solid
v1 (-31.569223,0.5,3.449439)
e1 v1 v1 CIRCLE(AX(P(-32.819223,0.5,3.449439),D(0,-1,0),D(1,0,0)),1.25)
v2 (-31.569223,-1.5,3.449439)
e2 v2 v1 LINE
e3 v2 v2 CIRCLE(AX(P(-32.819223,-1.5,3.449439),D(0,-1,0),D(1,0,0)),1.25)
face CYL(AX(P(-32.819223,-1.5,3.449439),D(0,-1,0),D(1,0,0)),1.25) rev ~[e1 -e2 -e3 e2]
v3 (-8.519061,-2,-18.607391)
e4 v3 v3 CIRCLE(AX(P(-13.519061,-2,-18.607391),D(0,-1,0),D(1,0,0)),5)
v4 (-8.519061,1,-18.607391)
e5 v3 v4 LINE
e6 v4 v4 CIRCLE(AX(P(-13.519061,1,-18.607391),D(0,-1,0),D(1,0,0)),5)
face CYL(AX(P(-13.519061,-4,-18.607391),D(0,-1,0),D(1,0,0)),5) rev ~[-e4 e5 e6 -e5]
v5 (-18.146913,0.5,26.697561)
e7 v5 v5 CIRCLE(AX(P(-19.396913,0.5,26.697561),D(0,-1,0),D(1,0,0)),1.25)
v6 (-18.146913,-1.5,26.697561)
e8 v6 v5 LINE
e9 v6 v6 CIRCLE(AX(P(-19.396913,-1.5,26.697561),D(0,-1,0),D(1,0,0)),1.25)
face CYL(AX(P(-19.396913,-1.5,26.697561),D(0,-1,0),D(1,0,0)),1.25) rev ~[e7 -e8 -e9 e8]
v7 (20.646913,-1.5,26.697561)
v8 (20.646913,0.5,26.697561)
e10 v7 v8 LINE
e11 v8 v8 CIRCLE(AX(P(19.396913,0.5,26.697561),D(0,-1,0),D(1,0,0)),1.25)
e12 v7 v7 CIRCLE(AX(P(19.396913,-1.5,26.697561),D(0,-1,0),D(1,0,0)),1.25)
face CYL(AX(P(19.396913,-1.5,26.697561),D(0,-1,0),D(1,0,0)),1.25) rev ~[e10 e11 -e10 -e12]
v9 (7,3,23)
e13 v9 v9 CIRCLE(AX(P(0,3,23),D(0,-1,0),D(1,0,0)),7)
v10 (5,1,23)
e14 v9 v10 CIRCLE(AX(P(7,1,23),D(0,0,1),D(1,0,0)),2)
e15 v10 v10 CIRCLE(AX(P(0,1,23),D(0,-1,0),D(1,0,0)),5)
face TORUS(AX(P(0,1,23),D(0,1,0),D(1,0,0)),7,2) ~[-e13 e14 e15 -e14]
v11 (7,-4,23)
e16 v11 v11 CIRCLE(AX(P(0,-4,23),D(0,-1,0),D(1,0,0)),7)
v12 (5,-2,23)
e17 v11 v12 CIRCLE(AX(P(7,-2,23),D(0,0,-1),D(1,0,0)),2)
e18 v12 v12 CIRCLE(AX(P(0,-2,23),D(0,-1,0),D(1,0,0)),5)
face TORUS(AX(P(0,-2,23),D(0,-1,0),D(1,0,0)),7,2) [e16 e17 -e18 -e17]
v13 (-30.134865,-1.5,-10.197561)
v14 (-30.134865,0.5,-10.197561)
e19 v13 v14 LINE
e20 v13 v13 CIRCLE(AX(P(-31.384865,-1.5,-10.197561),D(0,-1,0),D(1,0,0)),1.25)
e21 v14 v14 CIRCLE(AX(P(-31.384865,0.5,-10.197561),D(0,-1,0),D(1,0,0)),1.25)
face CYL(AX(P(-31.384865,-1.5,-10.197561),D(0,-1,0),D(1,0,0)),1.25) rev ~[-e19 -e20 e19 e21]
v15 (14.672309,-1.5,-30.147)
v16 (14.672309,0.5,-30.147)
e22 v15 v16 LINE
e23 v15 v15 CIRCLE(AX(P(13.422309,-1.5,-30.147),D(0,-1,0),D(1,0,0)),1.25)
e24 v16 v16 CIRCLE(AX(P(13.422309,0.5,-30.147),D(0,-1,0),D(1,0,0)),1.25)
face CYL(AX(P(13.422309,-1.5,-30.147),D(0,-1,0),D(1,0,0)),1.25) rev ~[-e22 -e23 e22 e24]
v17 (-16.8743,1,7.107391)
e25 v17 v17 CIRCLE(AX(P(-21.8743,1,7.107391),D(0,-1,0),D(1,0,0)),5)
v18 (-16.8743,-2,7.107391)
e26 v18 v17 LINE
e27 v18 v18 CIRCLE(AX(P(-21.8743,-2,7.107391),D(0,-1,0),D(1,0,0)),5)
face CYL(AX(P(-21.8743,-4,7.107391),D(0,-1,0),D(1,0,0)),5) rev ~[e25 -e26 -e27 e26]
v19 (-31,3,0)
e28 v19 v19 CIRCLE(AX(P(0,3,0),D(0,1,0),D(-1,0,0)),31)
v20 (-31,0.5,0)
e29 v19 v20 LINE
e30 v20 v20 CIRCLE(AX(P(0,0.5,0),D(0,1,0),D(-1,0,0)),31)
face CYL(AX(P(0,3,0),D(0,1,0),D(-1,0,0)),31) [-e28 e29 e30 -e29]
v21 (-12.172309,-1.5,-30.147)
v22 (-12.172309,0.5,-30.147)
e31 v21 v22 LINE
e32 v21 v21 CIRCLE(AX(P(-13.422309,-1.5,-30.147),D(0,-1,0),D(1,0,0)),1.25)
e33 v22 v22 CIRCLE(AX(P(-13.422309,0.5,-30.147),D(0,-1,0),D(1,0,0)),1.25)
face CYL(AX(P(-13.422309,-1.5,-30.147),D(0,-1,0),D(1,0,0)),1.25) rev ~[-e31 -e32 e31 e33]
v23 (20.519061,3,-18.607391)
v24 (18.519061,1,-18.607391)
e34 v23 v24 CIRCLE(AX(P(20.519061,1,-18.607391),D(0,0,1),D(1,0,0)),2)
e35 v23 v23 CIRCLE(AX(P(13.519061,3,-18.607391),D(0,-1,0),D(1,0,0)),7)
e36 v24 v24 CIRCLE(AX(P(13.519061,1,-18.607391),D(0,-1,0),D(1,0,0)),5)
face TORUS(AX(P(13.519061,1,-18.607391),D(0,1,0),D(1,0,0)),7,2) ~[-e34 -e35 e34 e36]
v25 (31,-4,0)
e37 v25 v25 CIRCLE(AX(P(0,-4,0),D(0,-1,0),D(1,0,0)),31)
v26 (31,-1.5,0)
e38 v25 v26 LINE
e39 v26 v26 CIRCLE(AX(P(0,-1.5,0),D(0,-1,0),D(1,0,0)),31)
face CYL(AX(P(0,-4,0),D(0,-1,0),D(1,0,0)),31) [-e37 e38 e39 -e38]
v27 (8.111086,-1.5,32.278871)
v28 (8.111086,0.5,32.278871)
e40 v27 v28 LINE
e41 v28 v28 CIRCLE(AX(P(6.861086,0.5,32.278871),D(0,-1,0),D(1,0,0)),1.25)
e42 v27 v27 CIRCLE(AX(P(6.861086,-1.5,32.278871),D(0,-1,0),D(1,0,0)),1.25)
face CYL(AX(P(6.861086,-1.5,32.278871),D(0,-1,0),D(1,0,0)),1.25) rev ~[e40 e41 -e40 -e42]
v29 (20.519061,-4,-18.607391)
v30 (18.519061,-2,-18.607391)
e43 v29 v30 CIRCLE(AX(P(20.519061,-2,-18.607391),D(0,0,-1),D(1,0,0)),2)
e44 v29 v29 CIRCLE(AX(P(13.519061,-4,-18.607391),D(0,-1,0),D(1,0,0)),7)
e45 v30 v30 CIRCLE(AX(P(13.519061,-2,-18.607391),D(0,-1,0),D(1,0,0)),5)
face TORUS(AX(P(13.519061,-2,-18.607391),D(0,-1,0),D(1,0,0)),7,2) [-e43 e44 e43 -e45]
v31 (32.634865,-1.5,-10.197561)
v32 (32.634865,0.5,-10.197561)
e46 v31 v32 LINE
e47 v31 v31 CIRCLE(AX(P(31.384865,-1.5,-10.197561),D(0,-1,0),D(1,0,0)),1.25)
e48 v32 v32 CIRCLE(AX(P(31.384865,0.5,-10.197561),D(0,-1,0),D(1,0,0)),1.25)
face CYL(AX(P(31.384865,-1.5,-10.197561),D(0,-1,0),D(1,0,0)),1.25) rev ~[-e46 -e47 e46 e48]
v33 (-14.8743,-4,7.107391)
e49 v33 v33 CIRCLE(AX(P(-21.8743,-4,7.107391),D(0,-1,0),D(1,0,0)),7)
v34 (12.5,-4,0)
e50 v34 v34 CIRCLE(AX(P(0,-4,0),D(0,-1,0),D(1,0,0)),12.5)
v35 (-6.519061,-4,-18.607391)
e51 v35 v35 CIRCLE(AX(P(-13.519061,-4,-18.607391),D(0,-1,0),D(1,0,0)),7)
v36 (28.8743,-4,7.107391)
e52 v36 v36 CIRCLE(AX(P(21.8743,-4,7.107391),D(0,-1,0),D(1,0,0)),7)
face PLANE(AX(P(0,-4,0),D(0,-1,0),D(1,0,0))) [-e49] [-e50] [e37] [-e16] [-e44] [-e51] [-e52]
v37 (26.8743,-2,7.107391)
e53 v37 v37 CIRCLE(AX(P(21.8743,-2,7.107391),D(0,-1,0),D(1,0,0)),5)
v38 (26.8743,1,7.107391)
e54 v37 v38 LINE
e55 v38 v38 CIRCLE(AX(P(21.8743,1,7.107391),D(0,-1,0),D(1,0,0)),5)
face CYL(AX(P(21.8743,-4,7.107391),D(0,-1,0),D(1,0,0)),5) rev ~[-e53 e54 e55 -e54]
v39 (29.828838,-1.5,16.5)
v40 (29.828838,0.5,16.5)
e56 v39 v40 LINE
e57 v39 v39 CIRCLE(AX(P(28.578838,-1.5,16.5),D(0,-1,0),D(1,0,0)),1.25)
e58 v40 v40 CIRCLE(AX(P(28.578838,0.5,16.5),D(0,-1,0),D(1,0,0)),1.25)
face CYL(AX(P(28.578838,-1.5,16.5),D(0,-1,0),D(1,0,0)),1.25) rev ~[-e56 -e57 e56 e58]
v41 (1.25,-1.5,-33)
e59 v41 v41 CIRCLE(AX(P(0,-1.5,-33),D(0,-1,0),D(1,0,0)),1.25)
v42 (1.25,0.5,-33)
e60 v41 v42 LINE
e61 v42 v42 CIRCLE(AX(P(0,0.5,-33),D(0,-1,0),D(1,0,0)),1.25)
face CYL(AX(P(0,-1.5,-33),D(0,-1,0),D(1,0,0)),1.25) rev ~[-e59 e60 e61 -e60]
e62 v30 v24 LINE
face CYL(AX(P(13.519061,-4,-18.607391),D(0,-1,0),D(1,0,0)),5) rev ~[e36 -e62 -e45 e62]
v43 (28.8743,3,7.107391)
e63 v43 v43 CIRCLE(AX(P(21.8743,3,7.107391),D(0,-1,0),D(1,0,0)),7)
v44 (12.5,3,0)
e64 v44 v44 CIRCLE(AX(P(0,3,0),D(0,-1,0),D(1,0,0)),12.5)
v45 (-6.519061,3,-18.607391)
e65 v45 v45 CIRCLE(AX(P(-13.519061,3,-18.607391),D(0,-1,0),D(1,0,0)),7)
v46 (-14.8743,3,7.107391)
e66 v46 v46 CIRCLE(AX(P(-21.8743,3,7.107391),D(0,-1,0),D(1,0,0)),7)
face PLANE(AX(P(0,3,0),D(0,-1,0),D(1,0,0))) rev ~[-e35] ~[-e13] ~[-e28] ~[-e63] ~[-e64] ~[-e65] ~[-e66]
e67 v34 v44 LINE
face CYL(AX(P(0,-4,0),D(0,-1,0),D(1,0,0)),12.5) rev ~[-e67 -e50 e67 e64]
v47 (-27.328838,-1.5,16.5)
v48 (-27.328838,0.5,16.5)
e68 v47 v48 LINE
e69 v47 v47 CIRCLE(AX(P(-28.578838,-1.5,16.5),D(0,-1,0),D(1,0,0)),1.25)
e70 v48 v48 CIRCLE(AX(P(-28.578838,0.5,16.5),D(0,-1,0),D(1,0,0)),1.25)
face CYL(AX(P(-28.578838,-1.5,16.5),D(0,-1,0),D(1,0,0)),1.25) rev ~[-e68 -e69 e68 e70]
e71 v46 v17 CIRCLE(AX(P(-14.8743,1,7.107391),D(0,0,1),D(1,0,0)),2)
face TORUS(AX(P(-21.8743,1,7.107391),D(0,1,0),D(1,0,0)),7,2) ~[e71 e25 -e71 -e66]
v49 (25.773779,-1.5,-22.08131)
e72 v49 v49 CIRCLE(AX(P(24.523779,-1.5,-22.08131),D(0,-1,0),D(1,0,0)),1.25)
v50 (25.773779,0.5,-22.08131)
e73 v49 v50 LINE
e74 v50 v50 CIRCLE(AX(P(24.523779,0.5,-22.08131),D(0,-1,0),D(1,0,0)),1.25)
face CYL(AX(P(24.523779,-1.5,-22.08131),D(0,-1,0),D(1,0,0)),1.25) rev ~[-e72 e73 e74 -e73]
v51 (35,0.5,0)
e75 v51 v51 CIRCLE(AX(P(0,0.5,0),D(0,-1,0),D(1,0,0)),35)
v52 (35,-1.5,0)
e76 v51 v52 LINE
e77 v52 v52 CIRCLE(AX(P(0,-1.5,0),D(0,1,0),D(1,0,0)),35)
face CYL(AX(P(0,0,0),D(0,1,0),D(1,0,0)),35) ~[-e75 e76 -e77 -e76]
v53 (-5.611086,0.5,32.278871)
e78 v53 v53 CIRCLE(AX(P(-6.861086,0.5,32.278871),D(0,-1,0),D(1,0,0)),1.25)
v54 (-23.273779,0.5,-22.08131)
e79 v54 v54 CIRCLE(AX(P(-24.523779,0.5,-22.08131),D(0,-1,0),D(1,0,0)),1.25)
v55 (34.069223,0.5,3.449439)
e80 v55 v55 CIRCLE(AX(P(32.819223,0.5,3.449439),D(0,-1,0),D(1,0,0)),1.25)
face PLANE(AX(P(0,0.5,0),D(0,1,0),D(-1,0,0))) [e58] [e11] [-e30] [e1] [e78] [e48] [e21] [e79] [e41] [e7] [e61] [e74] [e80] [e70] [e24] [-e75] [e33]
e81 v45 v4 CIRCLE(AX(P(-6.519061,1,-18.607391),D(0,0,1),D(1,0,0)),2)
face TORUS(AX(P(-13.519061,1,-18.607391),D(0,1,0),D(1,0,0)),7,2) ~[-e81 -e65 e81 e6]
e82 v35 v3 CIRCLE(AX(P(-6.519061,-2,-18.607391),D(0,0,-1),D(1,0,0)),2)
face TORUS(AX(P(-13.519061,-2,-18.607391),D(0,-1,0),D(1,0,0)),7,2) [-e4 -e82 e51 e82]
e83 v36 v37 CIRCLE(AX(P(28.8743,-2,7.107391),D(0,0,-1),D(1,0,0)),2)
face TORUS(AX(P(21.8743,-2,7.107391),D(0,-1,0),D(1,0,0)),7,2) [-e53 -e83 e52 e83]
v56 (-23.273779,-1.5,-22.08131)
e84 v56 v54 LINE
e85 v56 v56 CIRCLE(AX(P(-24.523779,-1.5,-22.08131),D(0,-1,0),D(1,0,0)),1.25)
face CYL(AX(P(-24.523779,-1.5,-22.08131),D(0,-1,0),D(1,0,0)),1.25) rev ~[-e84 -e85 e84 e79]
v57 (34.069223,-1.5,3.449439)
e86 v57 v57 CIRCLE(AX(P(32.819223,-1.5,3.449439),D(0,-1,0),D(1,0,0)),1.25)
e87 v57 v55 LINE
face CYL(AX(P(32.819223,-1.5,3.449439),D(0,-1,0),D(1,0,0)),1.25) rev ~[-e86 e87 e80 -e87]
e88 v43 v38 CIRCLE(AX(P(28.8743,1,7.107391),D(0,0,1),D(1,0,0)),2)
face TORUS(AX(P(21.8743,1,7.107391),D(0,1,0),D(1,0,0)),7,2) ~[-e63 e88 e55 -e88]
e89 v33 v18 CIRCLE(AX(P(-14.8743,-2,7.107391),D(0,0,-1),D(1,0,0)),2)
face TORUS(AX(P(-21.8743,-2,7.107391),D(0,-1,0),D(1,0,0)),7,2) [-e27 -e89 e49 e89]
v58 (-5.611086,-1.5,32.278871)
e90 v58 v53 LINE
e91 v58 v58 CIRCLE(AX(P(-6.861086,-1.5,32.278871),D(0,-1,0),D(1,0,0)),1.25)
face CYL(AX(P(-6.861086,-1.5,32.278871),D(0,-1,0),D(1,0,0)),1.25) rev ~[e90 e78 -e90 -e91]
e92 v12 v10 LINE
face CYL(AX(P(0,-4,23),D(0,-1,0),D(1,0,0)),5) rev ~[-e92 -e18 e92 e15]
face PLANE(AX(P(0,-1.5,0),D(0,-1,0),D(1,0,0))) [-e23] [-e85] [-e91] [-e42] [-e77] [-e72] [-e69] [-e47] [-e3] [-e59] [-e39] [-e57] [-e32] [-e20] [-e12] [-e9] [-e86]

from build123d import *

# Parameters (mm, degrees)
F0_R          = 35
F1_DEPTH      = 3
F1_DEPTH_BACK = 4
F2_R          = 12.5
F3_DEPTH      = 25
F4_R          = 5
F5_DEPTH      = 25
F7_R          = 2
F8_R          = 35.2185904309
F8_R_2        = 31
F9_DEPTH      = 2.5
F10_R         = 40.9097985185
F10_R_2       = 31
F11_DEPTH     = 2.5
F12_R         = 1.25
F13_DEPTH     = 25


# Not quite as in the source:
# - a feature names something its author has since deleted; it is built from what else it names


with BuildPart() as f1:
    # F0 (on Front) → F1 (new body, two sides)
    with BuildSketch(Plane.XZ) as f1_sk:
        Circle(F0_R)
    extrude(amount=-F1_DEPTH)
    extrude(f1_sk.sketch, amount=F1_DEPTH_BACK)

    # F2 (on face) → F3 (cut)
    with BuildSketch(Plane.XZ.offset(4)):
        Circle(F2_R)
    extrude(amount=-F3_DEPTH, mode=Mode.SUBTRACT)

    # F4 (on face) → F5 (cut)
    with BuildSketch(Plane.XZ.offset(4)):
        with Locations((0, 23)):
            Circle(F4_R)
        with Locations((-21.8742998748, 7.1073908706)):
            Circle(F4_R)
        with Locations((-13.5190608027, -18.6073908706)):
            Circle(F4_R)
        with Locations((13.5190608027, -18.6073908706)):
            Circle(F4_R)
        with Locations((21.8742998748, 7.1073908706)):
            Circle(F4_R)
    extrude(amount=-F5_DEPTH, mode=Mode.SUBTRACT)

    # F7
    f7_edges = [f1.edges().sort_by_distance(p)[0] for p in [
        (-5, -4, 23),
        (-26.8743, -4, 7.107391),
        (-18.519061, -4, -18.607391),
        (-26.8743, 3, 7.107391),
        (-18.519061, 3, -18.607391),
        (-5, 3, 23),
        (8.519061, -4, -18.607391),
        (8.519061, 3, -18.607391),
        (16.8743, -4, 7.107391),
        (16.8743, 3, 7.107391),
    ]]
    fillet(f7_edges, radius=F7_R)

    # F8 (on face) → F9 (cut)
    with BuildSketch(Plane.XZ.offset(4)):
        Circle(F8_R)
        Circle(F8_R_2, mode=Mode.SUBTRACT)
    extrude(amount=-F9_DEPTH, mode=Mode.SUBTRACT)

    # F10 (on face) → F11 (cut)
    with BuildSketch(Plane(origin=(0, 3, 0), x_dir=(-1, 0, 0), z_dir=(0, 1, 0))):
        Circle(F10_R)
        Circle(F10_R_2, mode=Mode.SUBTRACT)
    extrude(amount=-F11_DEPTH, mode=Mode.SUBTRACT)

    # F12 (on face) → F13 (cut)
    with BuildSketch(Plane.XZ.offset(1.5)):
        with Locations((6.861085797, 32.2788708242)):
            Circle(F12_R)
        with Locations((-6.861085797, 32.2788708242)):
            Circle(F12_R)
        with Locations((-19.3969133257, 26.6975608144)):
            Circle(F12_R)
        with Locations((-28.5788383249, 16.5)):
            Circle(F12_R)
        with Locations((-32.8192225472, 3.4494392878)):
            Circle(F12_R)
        with Locations((-31.3848650377, -10.1975608144)):
            Circle(F12_R)
        with Locations((-24.5237792408, -22.0813100098)):
            Circle(F12_R)
        with Locations((-13.4223092215, -30.1470001022)):
            Circle(F12_R)
        with Locations((0, -33)):
            Circle(F12_R)
        with Locations((13.4223092215, -30.1470001022)):
            Circle(F12_R)
        with Locations((24.5237792408, -22.0813100098)):
            Circle(F12_R)
        with Locations((31.3848650377, -10.1975608144)):
            Circle(F12_R)
        with Locations((32.8192225472, 3.4494392878)):
            Circle(F12_R)
        with Locations((28.5788383249, 16.5)):
            Circle(F12_R)
        with Locations((19.3969133257, 26.6975608144)):
            Circle(F12_R)
    extrude(amount=-F13_DEPTH, mode=Mode.SUBTRACT)


solid = f1.part
